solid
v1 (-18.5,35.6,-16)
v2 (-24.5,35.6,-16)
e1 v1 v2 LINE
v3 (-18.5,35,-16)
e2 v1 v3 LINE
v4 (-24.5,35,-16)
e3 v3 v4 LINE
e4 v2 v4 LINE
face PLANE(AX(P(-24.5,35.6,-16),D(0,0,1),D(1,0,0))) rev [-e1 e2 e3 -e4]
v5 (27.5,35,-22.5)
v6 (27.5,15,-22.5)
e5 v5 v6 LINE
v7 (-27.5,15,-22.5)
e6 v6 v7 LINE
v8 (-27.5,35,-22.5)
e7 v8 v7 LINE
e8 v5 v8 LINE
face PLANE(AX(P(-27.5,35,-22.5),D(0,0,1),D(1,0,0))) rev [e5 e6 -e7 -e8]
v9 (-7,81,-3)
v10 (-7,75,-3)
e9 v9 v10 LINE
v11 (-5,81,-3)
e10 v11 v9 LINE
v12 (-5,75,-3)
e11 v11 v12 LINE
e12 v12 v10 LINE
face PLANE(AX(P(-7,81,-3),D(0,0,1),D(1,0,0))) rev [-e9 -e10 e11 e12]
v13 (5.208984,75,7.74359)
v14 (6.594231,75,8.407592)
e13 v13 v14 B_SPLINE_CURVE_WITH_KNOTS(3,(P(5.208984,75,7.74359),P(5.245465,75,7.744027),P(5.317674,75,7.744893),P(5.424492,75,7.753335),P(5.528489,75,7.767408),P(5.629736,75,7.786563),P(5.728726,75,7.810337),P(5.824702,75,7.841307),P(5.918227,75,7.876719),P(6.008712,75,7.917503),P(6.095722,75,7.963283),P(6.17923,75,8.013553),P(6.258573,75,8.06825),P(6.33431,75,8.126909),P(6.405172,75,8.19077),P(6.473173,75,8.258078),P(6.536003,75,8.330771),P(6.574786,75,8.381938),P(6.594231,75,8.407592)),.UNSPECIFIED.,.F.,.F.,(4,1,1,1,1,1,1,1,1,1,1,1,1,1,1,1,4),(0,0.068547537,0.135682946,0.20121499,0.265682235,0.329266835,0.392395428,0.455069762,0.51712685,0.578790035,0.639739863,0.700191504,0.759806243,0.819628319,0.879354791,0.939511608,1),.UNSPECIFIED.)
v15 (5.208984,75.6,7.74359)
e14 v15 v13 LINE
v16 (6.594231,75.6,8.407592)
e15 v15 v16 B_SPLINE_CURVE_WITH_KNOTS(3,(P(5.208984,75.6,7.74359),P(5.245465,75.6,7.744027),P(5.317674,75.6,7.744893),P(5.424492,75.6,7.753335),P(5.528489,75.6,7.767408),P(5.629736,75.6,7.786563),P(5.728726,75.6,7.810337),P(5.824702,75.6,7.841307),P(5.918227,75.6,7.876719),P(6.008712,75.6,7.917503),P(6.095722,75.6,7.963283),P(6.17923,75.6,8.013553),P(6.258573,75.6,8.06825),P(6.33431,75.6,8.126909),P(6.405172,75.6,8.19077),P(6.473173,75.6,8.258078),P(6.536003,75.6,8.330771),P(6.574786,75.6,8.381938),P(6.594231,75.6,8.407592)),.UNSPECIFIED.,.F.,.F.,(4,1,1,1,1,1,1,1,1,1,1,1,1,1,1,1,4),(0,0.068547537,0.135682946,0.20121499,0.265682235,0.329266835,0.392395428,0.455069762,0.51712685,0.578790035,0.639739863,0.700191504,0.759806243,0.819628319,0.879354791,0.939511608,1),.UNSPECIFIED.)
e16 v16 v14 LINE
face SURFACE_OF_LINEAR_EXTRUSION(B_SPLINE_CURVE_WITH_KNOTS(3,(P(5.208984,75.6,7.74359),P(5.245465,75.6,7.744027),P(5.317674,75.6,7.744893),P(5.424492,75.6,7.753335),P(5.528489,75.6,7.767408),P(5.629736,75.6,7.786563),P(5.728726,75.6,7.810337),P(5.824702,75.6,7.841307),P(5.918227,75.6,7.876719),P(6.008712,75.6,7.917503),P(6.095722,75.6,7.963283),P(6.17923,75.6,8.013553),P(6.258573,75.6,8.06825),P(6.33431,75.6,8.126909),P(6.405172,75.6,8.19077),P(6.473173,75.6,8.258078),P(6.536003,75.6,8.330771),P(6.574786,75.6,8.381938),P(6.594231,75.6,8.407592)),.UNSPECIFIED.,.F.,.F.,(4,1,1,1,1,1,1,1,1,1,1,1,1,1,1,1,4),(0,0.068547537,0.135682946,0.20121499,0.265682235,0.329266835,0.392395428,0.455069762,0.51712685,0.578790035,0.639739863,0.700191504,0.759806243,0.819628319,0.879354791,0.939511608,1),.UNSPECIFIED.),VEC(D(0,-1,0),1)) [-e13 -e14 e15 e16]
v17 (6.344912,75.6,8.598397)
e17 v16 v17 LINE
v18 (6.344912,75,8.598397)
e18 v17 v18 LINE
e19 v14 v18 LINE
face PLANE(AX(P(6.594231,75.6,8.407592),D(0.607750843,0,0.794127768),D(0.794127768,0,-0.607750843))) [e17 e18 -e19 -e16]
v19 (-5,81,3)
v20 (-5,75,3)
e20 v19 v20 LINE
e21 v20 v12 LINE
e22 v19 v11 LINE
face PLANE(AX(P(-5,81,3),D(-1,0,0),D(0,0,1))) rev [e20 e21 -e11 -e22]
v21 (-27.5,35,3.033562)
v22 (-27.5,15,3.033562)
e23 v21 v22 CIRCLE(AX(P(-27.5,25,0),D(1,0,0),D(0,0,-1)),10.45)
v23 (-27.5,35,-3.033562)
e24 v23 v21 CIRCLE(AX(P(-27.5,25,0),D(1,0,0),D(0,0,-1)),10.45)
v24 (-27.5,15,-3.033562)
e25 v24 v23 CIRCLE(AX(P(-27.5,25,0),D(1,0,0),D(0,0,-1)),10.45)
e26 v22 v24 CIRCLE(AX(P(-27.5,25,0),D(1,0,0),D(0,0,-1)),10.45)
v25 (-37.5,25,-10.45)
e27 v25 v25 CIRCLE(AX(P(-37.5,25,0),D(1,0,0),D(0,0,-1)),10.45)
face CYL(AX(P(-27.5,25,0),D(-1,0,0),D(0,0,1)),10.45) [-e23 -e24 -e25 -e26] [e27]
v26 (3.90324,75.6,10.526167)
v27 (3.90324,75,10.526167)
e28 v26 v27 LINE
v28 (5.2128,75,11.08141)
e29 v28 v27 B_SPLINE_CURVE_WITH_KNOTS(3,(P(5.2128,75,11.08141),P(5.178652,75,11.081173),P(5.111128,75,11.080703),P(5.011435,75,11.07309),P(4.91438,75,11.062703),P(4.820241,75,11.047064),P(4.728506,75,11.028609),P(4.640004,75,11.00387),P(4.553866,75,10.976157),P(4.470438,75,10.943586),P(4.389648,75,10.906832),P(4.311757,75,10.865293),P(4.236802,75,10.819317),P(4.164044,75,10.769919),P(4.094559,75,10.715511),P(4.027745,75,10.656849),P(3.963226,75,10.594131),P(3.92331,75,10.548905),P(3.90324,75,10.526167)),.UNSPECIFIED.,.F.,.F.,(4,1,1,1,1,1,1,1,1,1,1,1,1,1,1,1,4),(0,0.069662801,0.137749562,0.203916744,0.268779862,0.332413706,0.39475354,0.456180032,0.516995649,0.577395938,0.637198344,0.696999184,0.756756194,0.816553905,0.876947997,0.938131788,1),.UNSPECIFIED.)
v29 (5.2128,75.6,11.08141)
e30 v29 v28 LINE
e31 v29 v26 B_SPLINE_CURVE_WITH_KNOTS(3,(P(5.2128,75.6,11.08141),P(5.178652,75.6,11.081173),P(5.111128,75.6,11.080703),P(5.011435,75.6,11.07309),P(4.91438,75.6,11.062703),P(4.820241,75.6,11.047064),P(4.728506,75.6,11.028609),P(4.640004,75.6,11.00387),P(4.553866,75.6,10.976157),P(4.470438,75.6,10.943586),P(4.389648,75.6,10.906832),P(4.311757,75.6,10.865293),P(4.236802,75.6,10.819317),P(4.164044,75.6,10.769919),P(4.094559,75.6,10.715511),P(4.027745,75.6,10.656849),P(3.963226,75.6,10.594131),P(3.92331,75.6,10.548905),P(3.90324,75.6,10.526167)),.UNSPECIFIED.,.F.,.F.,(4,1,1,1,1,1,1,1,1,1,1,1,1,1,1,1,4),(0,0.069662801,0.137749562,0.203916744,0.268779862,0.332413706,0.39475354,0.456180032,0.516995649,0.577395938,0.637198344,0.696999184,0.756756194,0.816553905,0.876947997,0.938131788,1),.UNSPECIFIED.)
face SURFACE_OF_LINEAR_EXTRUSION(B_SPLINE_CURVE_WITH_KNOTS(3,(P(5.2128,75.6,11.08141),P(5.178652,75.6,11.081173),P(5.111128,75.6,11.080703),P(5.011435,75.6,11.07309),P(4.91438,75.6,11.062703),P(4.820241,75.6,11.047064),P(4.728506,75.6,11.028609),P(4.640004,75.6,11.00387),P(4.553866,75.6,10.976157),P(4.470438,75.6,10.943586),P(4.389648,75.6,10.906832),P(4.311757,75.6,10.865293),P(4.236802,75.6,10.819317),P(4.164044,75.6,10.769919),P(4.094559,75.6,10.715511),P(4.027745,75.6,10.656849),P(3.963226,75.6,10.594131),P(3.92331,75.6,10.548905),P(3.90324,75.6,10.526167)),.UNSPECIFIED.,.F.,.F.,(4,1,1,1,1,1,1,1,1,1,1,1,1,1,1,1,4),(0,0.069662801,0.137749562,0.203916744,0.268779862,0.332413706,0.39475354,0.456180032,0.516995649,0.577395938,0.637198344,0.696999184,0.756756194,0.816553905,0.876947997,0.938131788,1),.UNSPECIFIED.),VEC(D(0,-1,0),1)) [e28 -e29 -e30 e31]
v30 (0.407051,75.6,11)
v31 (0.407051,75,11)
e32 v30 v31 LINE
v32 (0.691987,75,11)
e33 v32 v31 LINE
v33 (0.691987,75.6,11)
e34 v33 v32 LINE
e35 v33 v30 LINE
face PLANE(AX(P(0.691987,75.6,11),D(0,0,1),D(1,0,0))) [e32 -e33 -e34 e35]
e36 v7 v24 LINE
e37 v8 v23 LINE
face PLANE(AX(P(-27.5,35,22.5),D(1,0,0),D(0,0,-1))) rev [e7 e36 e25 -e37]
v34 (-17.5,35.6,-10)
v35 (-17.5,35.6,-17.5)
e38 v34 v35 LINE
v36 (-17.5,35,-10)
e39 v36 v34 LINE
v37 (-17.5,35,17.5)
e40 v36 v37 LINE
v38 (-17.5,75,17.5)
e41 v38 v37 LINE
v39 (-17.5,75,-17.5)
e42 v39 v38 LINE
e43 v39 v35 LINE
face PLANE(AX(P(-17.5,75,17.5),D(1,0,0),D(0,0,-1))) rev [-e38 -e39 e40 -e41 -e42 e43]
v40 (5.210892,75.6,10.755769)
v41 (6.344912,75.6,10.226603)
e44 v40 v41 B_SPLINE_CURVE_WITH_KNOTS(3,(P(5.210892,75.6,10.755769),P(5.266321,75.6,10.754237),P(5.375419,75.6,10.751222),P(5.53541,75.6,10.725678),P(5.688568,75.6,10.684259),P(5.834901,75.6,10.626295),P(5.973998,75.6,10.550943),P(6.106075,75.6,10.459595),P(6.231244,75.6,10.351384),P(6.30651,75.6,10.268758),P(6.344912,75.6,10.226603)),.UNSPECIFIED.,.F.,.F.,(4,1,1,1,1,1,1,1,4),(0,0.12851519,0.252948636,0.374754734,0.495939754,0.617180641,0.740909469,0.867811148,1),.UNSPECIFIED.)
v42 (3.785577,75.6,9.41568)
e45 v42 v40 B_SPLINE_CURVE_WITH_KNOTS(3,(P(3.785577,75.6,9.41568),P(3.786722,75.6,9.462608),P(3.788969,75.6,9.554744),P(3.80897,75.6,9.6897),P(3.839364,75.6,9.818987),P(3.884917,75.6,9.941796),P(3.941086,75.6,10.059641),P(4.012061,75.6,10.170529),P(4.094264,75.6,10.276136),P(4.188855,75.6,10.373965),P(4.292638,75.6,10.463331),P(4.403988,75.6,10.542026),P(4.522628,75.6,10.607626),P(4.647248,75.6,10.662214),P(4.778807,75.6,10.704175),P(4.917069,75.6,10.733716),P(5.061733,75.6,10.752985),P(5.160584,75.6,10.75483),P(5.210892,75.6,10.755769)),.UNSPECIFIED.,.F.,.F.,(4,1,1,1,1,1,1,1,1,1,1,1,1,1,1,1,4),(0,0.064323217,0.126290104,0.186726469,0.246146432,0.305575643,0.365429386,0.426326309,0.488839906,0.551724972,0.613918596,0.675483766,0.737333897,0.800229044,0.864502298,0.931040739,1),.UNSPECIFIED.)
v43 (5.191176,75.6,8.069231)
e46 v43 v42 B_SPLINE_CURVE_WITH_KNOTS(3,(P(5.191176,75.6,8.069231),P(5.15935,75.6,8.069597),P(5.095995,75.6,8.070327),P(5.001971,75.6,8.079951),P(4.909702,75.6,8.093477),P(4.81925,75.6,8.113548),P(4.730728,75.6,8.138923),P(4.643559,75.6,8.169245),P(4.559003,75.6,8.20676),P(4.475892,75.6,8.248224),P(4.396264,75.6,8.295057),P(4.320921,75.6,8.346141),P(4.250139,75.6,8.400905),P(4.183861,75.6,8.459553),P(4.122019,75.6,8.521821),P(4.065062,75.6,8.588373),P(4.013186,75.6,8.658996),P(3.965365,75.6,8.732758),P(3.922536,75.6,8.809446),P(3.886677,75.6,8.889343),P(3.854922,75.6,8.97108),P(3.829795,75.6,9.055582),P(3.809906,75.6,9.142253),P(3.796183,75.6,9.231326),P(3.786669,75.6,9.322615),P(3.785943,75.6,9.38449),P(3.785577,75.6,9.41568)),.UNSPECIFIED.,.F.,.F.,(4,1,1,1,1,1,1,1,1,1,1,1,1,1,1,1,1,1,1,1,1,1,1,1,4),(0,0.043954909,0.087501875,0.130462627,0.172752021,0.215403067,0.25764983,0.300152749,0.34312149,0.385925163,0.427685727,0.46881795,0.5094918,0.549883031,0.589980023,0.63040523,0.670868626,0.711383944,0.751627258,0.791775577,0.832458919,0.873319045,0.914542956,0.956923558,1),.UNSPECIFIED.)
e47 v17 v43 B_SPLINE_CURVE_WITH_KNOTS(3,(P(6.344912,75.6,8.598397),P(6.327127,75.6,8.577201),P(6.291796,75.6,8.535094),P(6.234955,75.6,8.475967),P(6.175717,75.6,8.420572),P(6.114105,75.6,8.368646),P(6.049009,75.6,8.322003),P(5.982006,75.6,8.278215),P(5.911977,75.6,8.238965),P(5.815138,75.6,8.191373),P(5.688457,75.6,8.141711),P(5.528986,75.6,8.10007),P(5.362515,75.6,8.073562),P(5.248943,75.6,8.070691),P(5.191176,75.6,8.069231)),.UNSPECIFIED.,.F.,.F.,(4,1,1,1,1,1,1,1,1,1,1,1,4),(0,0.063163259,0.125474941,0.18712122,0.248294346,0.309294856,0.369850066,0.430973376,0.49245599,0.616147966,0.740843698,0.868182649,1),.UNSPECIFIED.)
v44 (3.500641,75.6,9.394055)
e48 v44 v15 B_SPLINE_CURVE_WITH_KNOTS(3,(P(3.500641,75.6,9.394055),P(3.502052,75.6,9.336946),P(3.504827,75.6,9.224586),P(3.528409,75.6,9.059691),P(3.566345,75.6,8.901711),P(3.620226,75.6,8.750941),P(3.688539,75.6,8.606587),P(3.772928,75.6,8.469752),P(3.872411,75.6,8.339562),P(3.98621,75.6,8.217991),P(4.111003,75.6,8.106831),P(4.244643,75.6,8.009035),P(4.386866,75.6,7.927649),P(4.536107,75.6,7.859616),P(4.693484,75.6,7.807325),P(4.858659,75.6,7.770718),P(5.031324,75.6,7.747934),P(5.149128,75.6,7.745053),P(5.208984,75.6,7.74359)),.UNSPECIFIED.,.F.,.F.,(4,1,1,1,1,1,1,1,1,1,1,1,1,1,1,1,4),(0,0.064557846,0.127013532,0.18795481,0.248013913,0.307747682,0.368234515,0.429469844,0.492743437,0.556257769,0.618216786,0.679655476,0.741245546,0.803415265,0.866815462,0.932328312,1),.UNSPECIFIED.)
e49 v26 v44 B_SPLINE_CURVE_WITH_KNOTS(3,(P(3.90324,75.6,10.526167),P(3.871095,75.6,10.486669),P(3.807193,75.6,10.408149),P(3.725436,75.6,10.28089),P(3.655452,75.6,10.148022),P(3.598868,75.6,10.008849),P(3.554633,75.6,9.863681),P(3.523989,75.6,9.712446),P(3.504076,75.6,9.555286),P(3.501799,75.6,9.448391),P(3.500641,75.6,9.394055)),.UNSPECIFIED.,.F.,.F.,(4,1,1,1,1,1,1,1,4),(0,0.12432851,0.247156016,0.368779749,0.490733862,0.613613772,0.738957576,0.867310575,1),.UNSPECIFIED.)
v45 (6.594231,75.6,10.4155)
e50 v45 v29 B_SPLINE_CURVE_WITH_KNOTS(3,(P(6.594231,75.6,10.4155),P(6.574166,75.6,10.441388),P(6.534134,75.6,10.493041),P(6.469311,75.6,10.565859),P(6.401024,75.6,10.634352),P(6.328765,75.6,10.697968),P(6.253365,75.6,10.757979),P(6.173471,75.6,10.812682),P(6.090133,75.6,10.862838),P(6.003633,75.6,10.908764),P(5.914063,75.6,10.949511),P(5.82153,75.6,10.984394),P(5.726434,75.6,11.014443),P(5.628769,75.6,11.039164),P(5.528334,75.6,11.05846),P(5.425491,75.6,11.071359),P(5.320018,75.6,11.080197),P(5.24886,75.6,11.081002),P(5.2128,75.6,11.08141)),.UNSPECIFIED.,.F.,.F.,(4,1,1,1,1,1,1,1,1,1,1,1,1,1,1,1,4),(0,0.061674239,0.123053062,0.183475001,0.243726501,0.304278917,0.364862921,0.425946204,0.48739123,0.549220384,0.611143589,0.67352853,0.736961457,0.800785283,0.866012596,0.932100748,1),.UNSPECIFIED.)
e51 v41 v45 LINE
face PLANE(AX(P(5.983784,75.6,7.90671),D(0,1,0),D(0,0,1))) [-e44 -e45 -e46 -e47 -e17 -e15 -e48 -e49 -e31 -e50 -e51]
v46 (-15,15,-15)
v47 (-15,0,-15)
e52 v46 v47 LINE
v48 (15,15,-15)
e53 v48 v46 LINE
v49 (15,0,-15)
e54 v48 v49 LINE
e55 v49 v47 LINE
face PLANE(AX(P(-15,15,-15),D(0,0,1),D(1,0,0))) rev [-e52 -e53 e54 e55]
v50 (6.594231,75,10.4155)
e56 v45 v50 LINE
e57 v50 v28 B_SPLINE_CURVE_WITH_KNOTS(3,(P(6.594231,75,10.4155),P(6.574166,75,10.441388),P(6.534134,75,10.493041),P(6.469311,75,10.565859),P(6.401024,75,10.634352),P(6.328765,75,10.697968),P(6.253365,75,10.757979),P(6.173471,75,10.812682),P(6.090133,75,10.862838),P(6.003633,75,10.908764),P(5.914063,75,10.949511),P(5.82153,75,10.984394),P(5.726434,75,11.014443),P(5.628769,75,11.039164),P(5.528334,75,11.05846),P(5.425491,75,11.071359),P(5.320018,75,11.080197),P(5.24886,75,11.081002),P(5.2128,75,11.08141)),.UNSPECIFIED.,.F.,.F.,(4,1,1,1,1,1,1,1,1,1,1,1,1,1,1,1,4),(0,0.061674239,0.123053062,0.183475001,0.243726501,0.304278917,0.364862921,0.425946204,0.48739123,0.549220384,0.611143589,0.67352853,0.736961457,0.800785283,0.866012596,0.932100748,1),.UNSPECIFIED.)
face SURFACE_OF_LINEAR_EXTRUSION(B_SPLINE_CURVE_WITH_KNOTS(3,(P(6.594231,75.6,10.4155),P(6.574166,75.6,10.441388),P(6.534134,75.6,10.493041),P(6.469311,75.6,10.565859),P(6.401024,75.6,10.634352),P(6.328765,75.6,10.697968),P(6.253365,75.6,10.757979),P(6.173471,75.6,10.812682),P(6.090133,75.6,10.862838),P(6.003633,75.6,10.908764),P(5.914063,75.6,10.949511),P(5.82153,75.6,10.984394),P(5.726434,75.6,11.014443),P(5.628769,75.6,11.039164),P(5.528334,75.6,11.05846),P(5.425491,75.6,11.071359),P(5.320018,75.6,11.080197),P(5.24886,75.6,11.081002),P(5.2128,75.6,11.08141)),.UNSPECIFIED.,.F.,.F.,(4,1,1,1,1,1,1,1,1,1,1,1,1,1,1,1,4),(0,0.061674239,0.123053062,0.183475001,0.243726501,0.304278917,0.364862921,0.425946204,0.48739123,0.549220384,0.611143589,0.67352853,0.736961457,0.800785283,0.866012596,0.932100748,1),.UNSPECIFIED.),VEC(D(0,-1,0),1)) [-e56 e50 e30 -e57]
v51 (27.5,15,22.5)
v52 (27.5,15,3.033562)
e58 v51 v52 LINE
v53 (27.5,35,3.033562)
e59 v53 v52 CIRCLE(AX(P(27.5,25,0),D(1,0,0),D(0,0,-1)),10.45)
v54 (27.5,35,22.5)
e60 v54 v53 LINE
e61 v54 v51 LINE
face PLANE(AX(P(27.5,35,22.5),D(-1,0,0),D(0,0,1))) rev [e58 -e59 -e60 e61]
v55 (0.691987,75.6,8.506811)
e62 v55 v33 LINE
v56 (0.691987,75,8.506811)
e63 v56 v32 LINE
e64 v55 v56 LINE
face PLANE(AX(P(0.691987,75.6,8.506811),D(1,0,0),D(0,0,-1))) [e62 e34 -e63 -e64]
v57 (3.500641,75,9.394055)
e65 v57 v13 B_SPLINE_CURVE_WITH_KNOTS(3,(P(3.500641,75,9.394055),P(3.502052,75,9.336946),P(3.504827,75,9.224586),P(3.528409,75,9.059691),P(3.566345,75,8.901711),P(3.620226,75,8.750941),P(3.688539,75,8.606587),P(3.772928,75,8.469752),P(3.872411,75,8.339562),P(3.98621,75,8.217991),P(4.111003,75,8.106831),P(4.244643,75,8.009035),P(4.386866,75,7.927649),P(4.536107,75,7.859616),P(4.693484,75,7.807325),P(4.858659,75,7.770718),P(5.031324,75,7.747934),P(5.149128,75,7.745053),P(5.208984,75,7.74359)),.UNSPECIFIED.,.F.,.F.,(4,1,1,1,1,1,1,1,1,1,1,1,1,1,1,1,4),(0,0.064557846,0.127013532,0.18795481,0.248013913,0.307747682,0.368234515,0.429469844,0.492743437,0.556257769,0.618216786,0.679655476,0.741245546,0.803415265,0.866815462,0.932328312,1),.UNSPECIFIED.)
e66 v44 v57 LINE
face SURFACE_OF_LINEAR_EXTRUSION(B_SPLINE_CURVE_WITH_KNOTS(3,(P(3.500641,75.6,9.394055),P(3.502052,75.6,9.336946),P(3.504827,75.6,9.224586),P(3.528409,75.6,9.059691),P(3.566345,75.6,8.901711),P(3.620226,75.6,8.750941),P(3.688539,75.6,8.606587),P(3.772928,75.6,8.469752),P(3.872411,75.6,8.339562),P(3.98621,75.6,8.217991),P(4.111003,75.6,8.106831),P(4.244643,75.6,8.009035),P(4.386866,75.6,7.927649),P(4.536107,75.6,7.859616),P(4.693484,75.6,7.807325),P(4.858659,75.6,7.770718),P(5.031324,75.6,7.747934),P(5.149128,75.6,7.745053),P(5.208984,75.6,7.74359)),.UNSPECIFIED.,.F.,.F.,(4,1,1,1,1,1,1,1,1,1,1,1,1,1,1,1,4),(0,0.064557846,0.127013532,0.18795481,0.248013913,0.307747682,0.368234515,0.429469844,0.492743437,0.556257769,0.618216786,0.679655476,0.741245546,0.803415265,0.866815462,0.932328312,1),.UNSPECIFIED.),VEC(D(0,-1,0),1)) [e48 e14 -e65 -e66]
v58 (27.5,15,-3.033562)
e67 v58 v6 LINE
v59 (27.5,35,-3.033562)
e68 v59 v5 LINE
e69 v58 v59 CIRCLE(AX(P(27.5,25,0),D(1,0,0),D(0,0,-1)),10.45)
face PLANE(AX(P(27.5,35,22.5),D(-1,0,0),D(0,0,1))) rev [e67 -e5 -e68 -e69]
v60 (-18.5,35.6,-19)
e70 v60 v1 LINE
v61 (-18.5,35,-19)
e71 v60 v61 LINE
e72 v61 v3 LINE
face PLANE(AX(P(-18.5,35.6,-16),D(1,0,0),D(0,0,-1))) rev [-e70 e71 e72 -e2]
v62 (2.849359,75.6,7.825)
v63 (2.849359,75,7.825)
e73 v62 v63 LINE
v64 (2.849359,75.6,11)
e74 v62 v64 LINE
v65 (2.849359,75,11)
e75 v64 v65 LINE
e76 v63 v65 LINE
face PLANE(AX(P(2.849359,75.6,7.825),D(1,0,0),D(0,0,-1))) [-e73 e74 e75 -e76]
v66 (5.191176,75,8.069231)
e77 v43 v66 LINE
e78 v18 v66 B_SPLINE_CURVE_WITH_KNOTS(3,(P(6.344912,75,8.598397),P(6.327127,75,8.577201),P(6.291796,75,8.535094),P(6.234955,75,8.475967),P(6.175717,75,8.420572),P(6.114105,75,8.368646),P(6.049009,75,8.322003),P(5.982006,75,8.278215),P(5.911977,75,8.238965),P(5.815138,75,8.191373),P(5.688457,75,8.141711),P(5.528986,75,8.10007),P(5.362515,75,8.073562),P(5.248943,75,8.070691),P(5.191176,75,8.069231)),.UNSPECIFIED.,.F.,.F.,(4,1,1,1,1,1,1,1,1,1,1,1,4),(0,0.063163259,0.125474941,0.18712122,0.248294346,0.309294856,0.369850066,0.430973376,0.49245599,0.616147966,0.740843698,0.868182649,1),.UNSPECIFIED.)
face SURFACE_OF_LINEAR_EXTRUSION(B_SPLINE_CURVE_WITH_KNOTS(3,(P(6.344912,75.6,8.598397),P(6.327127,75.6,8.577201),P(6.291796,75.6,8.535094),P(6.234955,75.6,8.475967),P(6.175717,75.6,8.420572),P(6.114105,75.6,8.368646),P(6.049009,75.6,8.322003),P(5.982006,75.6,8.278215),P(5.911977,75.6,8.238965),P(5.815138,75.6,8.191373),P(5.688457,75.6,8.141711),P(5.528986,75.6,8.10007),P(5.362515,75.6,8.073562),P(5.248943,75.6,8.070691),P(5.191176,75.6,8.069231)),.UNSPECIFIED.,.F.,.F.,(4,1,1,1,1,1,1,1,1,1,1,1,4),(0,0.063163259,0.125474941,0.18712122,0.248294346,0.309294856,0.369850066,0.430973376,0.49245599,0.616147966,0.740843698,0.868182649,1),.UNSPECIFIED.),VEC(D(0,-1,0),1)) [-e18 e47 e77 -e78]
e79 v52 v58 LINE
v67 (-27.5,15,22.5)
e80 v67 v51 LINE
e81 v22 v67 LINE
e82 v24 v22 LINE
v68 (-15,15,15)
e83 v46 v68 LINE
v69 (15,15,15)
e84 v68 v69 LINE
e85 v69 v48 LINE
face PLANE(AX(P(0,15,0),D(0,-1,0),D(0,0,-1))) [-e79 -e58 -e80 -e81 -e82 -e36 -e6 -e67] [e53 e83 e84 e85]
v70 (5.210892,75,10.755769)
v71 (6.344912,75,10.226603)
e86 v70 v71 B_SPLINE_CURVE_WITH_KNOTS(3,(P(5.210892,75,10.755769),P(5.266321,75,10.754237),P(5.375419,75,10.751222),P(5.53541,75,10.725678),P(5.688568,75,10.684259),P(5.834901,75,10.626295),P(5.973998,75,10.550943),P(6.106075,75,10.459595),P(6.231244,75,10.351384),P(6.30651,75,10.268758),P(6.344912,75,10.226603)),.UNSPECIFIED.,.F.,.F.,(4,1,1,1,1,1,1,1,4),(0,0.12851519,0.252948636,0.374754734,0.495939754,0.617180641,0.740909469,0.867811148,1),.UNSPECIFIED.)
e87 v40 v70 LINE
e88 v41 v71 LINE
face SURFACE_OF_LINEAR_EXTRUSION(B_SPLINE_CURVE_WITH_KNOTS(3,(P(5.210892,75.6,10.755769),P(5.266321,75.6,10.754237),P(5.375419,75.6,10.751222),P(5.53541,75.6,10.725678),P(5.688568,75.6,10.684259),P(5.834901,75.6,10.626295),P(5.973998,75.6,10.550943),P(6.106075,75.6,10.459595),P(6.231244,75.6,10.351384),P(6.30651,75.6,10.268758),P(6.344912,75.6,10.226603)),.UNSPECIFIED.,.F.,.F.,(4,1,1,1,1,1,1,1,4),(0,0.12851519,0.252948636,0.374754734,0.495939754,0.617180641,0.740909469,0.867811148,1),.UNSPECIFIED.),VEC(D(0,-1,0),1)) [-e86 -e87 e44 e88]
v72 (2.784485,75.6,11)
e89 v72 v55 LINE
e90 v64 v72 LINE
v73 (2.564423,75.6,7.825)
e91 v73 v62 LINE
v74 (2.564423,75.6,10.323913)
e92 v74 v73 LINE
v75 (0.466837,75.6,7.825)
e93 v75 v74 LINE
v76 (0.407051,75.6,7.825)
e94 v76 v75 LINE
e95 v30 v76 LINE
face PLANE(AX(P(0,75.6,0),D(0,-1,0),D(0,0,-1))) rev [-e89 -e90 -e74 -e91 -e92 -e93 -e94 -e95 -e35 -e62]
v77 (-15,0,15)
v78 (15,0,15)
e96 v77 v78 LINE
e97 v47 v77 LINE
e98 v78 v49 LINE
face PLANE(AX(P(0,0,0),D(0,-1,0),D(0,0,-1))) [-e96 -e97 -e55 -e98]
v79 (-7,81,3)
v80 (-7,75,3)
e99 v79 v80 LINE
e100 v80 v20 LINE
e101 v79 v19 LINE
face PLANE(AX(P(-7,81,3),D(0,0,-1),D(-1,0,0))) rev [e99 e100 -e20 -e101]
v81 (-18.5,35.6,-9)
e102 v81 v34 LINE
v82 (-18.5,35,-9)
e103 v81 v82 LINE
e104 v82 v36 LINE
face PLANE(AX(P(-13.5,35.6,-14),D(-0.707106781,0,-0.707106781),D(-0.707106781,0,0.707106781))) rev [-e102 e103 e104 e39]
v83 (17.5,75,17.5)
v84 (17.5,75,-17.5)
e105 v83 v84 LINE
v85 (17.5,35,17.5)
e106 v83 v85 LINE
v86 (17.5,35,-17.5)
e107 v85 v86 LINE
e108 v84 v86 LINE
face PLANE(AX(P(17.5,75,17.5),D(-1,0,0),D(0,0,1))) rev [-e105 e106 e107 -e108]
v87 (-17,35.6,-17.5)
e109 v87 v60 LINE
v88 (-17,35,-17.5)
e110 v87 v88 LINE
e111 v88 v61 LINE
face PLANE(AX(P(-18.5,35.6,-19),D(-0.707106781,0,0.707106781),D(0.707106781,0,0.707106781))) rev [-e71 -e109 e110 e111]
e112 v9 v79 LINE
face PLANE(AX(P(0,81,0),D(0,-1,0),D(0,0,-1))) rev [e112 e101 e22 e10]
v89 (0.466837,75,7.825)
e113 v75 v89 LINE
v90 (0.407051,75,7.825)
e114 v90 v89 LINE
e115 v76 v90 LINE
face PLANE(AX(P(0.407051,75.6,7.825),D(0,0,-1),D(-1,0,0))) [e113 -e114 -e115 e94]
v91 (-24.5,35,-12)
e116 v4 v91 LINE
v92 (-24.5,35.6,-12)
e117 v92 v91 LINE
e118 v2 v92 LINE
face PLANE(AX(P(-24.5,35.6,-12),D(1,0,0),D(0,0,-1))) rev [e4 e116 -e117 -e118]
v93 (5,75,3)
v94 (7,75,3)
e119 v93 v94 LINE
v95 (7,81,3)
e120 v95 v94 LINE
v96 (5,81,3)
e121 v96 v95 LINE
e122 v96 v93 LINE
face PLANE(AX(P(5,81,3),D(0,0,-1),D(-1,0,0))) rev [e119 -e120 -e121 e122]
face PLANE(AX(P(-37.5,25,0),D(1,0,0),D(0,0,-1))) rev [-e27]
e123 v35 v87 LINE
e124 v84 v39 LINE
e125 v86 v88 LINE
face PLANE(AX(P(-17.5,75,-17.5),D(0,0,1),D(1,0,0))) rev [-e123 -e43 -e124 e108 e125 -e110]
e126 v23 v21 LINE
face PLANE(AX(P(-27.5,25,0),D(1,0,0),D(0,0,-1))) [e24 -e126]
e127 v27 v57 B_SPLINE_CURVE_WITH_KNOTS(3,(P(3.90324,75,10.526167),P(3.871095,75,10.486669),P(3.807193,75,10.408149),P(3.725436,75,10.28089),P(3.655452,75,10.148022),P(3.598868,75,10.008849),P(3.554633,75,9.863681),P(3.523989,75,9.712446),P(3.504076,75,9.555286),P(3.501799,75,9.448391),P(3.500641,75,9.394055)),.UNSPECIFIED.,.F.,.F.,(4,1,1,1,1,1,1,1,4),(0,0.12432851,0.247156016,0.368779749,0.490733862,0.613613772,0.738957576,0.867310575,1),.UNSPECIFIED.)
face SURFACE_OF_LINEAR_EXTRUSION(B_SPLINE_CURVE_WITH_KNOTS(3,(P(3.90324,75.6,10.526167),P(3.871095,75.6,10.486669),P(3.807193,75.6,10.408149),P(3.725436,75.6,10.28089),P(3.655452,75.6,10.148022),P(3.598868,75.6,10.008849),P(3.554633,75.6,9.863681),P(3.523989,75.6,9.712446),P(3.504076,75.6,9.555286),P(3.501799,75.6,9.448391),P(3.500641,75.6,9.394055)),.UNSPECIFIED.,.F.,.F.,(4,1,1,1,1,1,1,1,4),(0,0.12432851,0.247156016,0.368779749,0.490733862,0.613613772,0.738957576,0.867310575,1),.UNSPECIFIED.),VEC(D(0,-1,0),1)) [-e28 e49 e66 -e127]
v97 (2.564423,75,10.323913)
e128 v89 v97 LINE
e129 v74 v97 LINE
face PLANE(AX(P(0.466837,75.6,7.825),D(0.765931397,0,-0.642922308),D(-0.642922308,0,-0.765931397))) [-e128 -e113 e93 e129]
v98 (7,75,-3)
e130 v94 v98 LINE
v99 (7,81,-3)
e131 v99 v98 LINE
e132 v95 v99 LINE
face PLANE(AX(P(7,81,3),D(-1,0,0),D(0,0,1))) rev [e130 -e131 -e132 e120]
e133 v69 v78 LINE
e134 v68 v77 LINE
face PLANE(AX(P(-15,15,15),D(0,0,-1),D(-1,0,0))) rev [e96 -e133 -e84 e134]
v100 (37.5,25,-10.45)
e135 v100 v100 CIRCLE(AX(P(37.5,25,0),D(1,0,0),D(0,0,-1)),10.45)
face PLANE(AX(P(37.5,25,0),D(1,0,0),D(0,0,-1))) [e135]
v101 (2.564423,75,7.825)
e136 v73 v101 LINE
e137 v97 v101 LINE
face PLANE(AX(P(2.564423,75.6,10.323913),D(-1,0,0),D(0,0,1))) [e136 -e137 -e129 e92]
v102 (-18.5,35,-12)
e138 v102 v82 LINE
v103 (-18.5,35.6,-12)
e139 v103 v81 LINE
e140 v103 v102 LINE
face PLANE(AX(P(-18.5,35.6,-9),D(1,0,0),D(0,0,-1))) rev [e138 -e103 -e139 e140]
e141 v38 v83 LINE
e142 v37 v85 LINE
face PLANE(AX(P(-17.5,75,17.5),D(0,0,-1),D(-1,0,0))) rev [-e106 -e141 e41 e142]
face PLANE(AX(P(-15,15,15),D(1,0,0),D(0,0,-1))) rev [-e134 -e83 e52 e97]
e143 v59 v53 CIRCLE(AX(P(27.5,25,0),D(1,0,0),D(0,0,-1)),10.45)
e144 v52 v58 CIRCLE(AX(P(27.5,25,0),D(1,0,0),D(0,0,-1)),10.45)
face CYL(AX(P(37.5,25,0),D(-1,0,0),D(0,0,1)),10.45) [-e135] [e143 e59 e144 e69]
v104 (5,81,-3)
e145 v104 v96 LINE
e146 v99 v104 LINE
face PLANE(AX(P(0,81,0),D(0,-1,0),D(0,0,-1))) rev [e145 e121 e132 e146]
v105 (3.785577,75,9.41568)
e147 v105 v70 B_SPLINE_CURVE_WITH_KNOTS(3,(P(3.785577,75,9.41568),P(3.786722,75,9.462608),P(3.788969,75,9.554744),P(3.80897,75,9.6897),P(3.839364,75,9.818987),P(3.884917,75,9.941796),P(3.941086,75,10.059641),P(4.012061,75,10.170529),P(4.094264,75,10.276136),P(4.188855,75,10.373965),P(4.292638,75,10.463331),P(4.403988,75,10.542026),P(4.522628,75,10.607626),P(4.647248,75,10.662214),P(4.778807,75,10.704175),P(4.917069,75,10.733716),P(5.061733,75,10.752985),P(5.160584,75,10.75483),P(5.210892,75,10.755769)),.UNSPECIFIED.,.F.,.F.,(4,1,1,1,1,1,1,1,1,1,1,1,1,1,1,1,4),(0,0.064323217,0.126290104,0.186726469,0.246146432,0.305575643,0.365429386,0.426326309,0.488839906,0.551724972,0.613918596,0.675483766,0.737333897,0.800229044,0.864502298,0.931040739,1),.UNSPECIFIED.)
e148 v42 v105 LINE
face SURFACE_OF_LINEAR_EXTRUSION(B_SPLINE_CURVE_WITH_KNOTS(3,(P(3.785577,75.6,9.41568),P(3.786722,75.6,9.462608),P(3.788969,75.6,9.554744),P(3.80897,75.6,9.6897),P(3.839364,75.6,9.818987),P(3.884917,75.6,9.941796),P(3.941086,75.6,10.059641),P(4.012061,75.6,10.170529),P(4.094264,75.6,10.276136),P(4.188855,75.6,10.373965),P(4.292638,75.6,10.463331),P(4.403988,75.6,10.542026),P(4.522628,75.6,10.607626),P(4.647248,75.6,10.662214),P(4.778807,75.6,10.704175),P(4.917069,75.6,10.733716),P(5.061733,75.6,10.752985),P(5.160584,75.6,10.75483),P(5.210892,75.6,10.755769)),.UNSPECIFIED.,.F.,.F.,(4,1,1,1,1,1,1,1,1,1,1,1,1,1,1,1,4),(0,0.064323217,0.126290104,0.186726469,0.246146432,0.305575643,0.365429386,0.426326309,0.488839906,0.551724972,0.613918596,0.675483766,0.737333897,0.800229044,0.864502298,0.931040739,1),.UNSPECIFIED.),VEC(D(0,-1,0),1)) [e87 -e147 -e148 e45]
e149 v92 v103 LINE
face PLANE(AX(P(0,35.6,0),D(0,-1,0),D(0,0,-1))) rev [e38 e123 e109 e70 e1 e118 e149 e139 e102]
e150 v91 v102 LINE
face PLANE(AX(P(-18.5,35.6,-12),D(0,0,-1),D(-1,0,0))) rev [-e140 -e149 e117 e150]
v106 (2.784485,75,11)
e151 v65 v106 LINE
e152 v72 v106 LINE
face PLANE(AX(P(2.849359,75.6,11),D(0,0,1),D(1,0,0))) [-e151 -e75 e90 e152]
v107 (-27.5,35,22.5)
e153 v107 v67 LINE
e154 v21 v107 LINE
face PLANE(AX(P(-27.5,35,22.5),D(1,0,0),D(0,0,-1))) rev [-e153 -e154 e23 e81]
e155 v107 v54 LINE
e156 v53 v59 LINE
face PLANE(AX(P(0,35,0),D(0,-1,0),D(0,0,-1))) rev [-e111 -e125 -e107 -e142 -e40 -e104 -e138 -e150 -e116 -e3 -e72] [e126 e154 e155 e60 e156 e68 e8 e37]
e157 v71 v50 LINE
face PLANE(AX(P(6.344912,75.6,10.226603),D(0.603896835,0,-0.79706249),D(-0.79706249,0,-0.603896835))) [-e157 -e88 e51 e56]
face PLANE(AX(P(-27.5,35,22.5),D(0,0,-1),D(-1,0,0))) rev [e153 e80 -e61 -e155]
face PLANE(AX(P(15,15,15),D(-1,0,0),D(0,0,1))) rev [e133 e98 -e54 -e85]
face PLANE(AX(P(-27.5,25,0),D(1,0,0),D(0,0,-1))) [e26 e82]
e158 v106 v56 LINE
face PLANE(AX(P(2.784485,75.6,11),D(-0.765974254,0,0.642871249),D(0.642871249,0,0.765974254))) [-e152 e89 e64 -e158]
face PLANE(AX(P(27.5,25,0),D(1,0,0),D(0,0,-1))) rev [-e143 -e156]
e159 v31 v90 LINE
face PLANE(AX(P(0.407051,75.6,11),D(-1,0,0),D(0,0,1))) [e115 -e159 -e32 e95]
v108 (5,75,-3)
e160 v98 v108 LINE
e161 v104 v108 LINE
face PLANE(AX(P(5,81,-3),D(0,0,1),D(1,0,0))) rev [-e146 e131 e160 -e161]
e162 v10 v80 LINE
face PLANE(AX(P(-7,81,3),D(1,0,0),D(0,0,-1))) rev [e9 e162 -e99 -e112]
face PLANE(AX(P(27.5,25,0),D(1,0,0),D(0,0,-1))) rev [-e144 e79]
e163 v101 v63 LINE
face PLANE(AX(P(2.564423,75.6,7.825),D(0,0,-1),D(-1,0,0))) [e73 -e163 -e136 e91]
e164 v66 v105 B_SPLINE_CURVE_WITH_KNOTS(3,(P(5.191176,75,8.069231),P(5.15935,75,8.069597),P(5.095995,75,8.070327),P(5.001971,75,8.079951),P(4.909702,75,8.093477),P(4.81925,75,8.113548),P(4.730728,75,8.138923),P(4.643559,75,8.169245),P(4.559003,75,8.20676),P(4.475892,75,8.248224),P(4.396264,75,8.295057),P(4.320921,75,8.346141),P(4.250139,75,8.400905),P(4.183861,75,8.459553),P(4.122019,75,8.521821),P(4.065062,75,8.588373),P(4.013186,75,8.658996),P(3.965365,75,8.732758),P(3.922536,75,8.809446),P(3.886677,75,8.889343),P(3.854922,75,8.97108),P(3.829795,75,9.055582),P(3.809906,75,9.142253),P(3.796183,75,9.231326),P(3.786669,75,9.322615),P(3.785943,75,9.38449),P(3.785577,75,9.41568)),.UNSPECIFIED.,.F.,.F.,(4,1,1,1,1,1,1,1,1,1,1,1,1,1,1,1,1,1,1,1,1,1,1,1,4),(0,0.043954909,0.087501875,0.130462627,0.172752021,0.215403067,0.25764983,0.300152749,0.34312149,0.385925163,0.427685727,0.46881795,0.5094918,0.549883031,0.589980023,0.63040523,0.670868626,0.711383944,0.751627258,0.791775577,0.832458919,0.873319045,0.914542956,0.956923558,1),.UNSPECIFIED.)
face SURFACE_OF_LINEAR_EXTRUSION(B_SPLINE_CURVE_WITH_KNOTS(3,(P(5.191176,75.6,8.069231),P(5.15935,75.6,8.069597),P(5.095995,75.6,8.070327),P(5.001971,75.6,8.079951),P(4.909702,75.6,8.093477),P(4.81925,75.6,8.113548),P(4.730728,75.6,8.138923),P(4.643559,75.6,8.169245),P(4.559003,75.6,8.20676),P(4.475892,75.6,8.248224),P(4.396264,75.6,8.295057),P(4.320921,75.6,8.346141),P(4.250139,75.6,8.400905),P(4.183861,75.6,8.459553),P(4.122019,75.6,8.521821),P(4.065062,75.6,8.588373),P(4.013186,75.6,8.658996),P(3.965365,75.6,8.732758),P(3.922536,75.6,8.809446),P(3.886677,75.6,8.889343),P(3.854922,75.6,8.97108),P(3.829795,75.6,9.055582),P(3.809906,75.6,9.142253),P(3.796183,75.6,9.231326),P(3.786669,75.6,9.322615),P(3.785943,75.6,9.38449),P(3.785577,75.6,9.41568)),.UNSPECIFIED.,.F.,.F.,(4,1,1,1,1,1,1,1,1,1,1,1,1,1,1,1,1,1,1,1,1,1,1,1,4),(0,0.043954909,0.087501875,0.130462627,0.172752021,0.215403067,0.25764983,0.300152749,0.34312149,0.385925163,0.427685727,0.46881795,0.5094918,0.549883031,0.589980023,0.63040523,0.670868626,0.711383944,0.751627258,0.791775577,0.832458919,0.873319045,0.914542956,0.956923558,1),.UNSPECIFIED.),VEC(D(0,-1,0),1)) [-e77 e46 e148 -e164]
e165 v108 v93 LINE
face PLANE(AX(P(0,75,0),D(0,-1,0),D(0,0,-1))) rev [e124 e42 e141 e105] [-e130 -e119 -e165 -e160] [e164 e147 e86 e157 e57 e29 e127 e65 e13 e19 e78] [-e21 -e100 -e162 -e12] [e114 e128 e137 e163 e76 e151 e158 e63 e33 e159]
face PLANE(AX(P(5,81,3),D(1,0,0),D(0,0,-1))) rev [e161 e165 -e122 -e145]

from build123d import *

# Parameters (mm, degrees)
VALVE_BODY_START   = 15
SKETCH1_W          = 55
SKETCH1_H          = 45
VALVE_BODY_DEPTH   = 20
COIL_START         = 35
SKETCH2_W          = 35
SKETCH2_H          = 35
COIL_DEPTH         = 40
PORT_IN_G12_START  = -37.5
SKETCH3_R          = 10.45
PORT_IN_G12_DEPTH  = 10
PORT_OUT_G12_START = 27.5
SKETCH4_R          = 10.45
PORT_OUT_G12_DEPTH = 10
SKETCH5_W          = 30
SKETCH5_H          = 30
MOUNT_FOOT_DEPTH   = 15
SPADE_1_START      = 75
SKETCH6_W          = 2
SKETCH6_H          = 6
SPADE_1_DEPTH      = 6
SPADE_2_START      = 75
SKETCH7_W          = 2
SKETCH7_H          = 6
SPADE_2_DEPTH      = 6
LABEL_NC_START     = 75
LABEL_NC_DEPTH     = 0.6
FLOW_ARROW_START   = 35
FLOW_ARROW_DEPTH   = 0.6


# Read off the part's stored shape, not the designer's step: Label_NC
with BuildPart() as part:
    # Sketch1 → Valve_Body (new body)
    with BuildSketch(Plane(origin=(0, 0, 0), x_dir=(1, 0, 0), z_dir=(0, 1, 0)).offset(VALVE_BODY_START)):
        Rectangle(SKETCH1_W, SKETCH1_H)
    extrude(amount=VALVE_BODY_DEPTH)

    # Sketch2 → Coil (add)
    with BuildSketch(Plane(origin=(0, 0, 0), x_dir=(1, 0, 0), z_dir=(0, 1, 0)).offset(COIL_START)):
        Rectangle(SKETCH2_W, SKETCH2_H)
    extrude(amount=COIL_DEPTH)

    # Sketch3 → Port_In_G12 (add)
    with BuildSketch(Plane(origin=(0, 0, 0), x_dir=(0, 0, -1), z_dir=(1, 0, 0)).offset(PORT_IN_G12_START)):
        with Locations(Location((0, 25, 0), (0, 0, 253.124499321))):
            Circle(SKETCH3_R)
    extrude(amount=PORT_IN_G12_DEPTH)

    # Sketch4 → Port_Out_G12 (add)
    with BuildSketch(Plane(origin=(0, 0, 0), x_dir=(0, 0, -1), z_dir=(1, 0, 0)).offset(PORT_OUT_G12_START)):
        with Locations(Location((0, 25, 0), (0, 0, 253.124499321))):
            Circle(SKETCH4_R)
    extrude(amount=PORT_OUT_G12_DEPTH)

    # Sketch5 → Mount_Foot (add)
    with BuildSketch(Plane(origin=(0, 0, 0), x_dir=(1, 0, 0), z_dir=(0, 1, 0))):
        Rectangle(SKETCH5_W, SKETCH5_H)
    extrude(amount=MOUNT_FOOT_DEPTH)

    # Sketch6 → Spade_1 (add)
    with BuildSketch(Plane(origin=(0, 0, 0), x_dir=(1, 0, 0), z_dir=(0, 1, 0)).offset(SPADE_1_START)):
        with Locations((-6, 0)):
            Rectangle(SKETCH6_W, SKETCH6_H)
    extrude(amount=SPADE_1_DEPTH)

    # Sketch7 → Spade_2 (add)
    with BuildSketch(Plane(origin=(0, 0, 0), x_dir=(1, 0, 0), z_dir=(0, 1, 0)).offset(SPADE_2_START)):
        with Locations((6, 0)):
            Rectangle(SKETCH7_W, SKETCH7_H)
    extrude(amount=SPADE_2_DEPTH)

    # Label_NC outline → Label_NC (add)
    with BuildSketch(Plane(origin=(0, 0, 0), x_dir=(1, 0, 0), z_dir=(0, 1, 0)).offset(LABEL_NC_START)):
        with BuildLine():
            add(Edge.make_bspline(
                [(5.208984375, -7.743589744), (5.245464646, -7.744027112), (5.317673669, -7.744892838), (5.424492146, -7.753334838), (5.528489114, -7.767407896), (5.629736219, -7.786563187), (5.728726021, -7.810336972), (5.824701954, -7.8413071), (5.918227191, -7.87671881), (6.008711886, -7.917502561), (6.0957219, -7.963283105), (6.179230132, -8.013552993), (6.258573253, -8.068249902), (6.334309566, -8.12690864), (6.405172129, -8.19077019), (6.473172899, -8.258078009), (6.536002591, -8.330770835), (6.574785846, -8.381938168), (6.594230769, -8.407592147)],
                knots=[0, 0, 0, 0, 0.068547537, 0.135682946, 0.20121499, 0.265682235, 0.329266835, 0.392395428, 0.455069762, 0.51712685, 0.578790035, 0.639739863, 0.700191504, 0.759806243, 0.819628319, 0.879354791, 0.939511608, 1, 1, 1, 1], degree=3))
            add(Edge.make_bspline(
                [(3.500641026, -9.394055489), (3.502051808, -9.336945899), (3.504827435, -9.224586346), (3.528409335, -9.059691402), (3.566344958, -8.901711205), (3.620226421, -8.750940665), (3.688539133, -8.606586768), (3.772927561, -8.469752247), (3.872411326, -8.339562007), (3.98621019, -8.217991482), (4.111003416, -8.106830784), (4.244642626, -8.009035156), (4.386866249, -7.927648553), (4.536107443, -7.85961632), (4.69348374, -7.807324557), (4.858659368, -7.770718451), (5.031323955, -7.747933639), (5.149127727, -7.745053272), (5.208984375, -7.743589744)],
                knots=[0, 0, 0, 0, 0.064557846, 0.127013532, 0.18795481, 0.248013913, 0.307747682, 0.368234515, 0.429469844, 0.492743437, 0.556257769, 0.618216786, 0.679655476, 0.741245546, 0.803415265, 0.866815462, 0.932328312, 1, 1, 1, 1], degree=3))
            add(Edge.make_bspline(
                [(3.903240184, -10.526166867), (3.871094993, -10.486668788), (3.807192697, -10.408149487), (3.725435826, -10.280890061), (3.655451973, -10.148022472), (3.598868102, -10.008848679), (3.554633337, -9.863680978), (3.523988967, -9.71244619), (3.504075726, -9.555285556), (3.501798535, -9.448390755), (3.500641026, -9.394055489)],
                knots=[0, 0, 0, 0, 0.12432851, 0.247156016, 0.368779749, 0.490733862, 0.613613772, 0.738957576, 0.867310575, 1, 1, 1, 1], degree=3))
            add(Edge.make_bspline(
                [(5.212800481, -11.081410256), (5.178652297, -11.081172592), (5.111128492, -11.080702639), (5.011434625, -11.073089745), (4.914379791, -11.062703197), (4.82024138, -11.047063936), (4.728505674, -11.028608713), (4.640004287, -11.003869787), (4.553866346, -10.976157329), (4.470437923, -10.943586377), (4.389648052, -10.906832411), (4.311757309, -10.865292926), (4.236801517, -10.819317234), (4.164043742, -10.76991876), (4.094558791, -10.715510779), (4.027744522, -10.656848904), (3.963226276, -10.594130851), (3.923309554, -10.548905377), (3.903240184, -10.526166867)],
                knots=[0, 0, 0, 0, 0.069662801, 0.137749562, 0.203916744, 0.268779862, 0.332413706, 0.39475354, 0.456180032, 0.516995649, 0.577395938, 0.637198344, 0.696999184, 0.756756194, 0.816553905, 0.876947997, 0.938131788, 1, 1, 1, 1], degree=3))
            add(Edge.make_bspline(
                [(6.594230769, -10.4154998), (6.574166484, -10.441388252), (6.53413402, -10.493041154), (6.46931139, -10.565859062), (6.401024128, -10.634352008), (6.328765019, -10.697967779), (6.253365308, -10.75797933), (6.173471139, -10.812681706), (6.090132803, -10.862838436), (6.003632668, -10.908764289), (5.914062641, -10.949510649), (5.821530046, -10.98439371), (5.726433738, -11.014442717), (5.62876937, -11.039164117), (5.528334362, -11.058460028), (5.425491146, -11.071359305), (5.32001776, -11.080196613), (5.248860185, -11.081002079), (5.212800481, -11.081410256)],
                knots=[0, 0, 0, 0, 0.061674239, 0.123053062, 0.183475001, 0.243726501, 0.304278917, 0.364862921, 0.425946204, 0.48739123, 0.549220384, 0.611143589, 0.67352853, 0.736961457, 0.800785283, 0.866012596, 0.932100748, 1, 1, 1, 1], degree=3))
            Line((6.594230769, -10.4154998), (6.344911859, -10.226602564))
            add(Edge.make_bspline(
                [(5.210892428, -10.755769231), (5.266321296, -10.754237266), (5.375418567, -10.751221994), (5.535409563, -10.725677532), (5.688567722, -10.684259278), (5.834901282, -10.626294734), (5.973997711, -10.550942652), (6.106074682, -10.459595291), (6.231243678, -10.351383732), (6.306510484, -10.268758323), (6.344911859, -10.226602564)],
                knots=[0, 0, 0, 0, 0.12851519, 0.252948636, 0.374754734, 0.495939754, 0.617180641, 0.740909469, 0.867811148, 1, 1, 1, 1], degree=3))
            add(Edge.make_bspline(
                [(3.785576923, -9.415680088), (3.786721573, -9.462607785), (3.788968942, -9.554744095), (3.808969931, -9.689700291), (3.839363835, -9.818986903), (3.884916537, -9.941795759), (3.941085961, -10.059641199), (4.012061373, -10.170529301), (4.094263518, -10.276135756), (4.188855313, -10.373964716), (4.292637731, -10.463330738), (4.403987623, -10.542025909), (4.522627655, -10.607625838), (4.647247884, -10.662214018), (4.778807287, -10.704175478), (4.917069287, -10.73371579), (5.061733168, -10.752985482), (5.160583981, -10.754830328), (5.210892428, -10.755769231)],
                knots=[0, 0, 0, 0, 0.064323217, 0.126290104, 0.186726469, 0.246146432, 0.305575643, 0.365429386, 0.426326309, 0.488839906, 0.551724972, 0.613918596, 0.675483766, 0.737333897, 0.800229044, 0.864502298, 0.931040739, 1, 1, 1, 1], degree=3))
            add(Edge.make_bspline(
                [(5.191175881, -8.069230769), (5.159350317, -8.069597221), (5.095994559, -8.070326723), (5.001970587, -8.079950715), (4.909702319, -8.093477313), (4.819249775, -8.113548142), (4.730728091, -8.138923304), (4.643558555, -8.169244929), (4.559003225, -8.206759677), (4.475892395, -8.248223598), (4.39626411, -8.295057066), (4.320921317, -8.346141321), (4.250138803, -8.400904716), (4.183860577, -8.459552505), (4.122018881, -8.521820569), (4.06506182, -8.588372508), (4.013186484, -8.658995551), (3.965364611, -8.732758427), (3.922535917, -8.809446281), (3.886676669, -8.889342952), (3.854922023, -8.971080246), (3.829794853, -9.055581656), (3.809906184, -9.142252594), (3.796183232, -9.231325666), (3.78666869, -9.322614789), (3.785942816, -9.38449038), (3.785576923, -9.415680088)],
                knots=[0, 0, 0, 0, 0.043954909, 0.087501875, 0.130462627, 0.172752021, 0.215403067, 0.25764983, 0.300152749, 0.34312149, 0.385925163, 0.427685727, 0.46881795, 0.5094918, 0.549883031, 0.589980023, 0.63040523, 0.670868626, 0.711383944, 0.751627258, 0.791775577, 0.832458919, 0.873319045, 0.914542956, 0.956923558, 1, 1, 1, 1], degree=3))
            add(Edge.make_bspline(
                [(6.344911859, -8.598397436), (6.327126517, -8.577201163), (6.291795619, -8.53509439), (6.234954771, -8.475967232), (6.175716852, -8.420572316), (6.114104507, -8.368645754), (6.049008734, -8.322003402), (5.982006438, -8.278214616), (5.911976783, -8.238964596), (5.815137709, -8.191373173), (5.688457161, -8.14171059), (5.528986128, -8.100069801), (5.362515346, -8.07356202), (5.248943238, -8.070691057), (5.191175881, -8.069230769)],
                knots=[0, 0, 0, 0, 0.063163259, 0.125474941, 0.18712122, 0.248294346, 0.309294856, 0.369850066, 0.430973376, 0.49245599, 0.616147966, 0.740843698, 0.868182649, 1, 1, 1, 1], degree=3))
            Line((6.344911859, -8.598397436), (6.594230769, -8.407592147))
        make_face()
        Polygon((0.407051282, -7.825), (0.407051282, -11), (0.691987179, -11), (0.691987179, -8.506810897), (2.784485176, -11), (2.849358974, -11), (2.849358974, -7.825), (2.564423077, -7.825), (2.564423077, -10.323913261), (0.466836939, -7.825), align=None)
    extrude(amount=LABEL_NC_DEPTH)

    # Sketch9 → Flow_Arrow (add)
    with BuildSketch(Plane(origin=(0, 0, 0), x_dir=(1, 0, 0), z_dir=(0, 1, 0)).offset(FLOW_ARROW_START)):
        Polygon((-24.5, 16), (-18.5, 16), (-18.5, 19), (-13.5, 14), (-18.5, 9), (-18.5, 12), (-24.5, 12), align=None)
    extrude(amount=FLOW_ARROW_DEPTH)


solid = part.part
